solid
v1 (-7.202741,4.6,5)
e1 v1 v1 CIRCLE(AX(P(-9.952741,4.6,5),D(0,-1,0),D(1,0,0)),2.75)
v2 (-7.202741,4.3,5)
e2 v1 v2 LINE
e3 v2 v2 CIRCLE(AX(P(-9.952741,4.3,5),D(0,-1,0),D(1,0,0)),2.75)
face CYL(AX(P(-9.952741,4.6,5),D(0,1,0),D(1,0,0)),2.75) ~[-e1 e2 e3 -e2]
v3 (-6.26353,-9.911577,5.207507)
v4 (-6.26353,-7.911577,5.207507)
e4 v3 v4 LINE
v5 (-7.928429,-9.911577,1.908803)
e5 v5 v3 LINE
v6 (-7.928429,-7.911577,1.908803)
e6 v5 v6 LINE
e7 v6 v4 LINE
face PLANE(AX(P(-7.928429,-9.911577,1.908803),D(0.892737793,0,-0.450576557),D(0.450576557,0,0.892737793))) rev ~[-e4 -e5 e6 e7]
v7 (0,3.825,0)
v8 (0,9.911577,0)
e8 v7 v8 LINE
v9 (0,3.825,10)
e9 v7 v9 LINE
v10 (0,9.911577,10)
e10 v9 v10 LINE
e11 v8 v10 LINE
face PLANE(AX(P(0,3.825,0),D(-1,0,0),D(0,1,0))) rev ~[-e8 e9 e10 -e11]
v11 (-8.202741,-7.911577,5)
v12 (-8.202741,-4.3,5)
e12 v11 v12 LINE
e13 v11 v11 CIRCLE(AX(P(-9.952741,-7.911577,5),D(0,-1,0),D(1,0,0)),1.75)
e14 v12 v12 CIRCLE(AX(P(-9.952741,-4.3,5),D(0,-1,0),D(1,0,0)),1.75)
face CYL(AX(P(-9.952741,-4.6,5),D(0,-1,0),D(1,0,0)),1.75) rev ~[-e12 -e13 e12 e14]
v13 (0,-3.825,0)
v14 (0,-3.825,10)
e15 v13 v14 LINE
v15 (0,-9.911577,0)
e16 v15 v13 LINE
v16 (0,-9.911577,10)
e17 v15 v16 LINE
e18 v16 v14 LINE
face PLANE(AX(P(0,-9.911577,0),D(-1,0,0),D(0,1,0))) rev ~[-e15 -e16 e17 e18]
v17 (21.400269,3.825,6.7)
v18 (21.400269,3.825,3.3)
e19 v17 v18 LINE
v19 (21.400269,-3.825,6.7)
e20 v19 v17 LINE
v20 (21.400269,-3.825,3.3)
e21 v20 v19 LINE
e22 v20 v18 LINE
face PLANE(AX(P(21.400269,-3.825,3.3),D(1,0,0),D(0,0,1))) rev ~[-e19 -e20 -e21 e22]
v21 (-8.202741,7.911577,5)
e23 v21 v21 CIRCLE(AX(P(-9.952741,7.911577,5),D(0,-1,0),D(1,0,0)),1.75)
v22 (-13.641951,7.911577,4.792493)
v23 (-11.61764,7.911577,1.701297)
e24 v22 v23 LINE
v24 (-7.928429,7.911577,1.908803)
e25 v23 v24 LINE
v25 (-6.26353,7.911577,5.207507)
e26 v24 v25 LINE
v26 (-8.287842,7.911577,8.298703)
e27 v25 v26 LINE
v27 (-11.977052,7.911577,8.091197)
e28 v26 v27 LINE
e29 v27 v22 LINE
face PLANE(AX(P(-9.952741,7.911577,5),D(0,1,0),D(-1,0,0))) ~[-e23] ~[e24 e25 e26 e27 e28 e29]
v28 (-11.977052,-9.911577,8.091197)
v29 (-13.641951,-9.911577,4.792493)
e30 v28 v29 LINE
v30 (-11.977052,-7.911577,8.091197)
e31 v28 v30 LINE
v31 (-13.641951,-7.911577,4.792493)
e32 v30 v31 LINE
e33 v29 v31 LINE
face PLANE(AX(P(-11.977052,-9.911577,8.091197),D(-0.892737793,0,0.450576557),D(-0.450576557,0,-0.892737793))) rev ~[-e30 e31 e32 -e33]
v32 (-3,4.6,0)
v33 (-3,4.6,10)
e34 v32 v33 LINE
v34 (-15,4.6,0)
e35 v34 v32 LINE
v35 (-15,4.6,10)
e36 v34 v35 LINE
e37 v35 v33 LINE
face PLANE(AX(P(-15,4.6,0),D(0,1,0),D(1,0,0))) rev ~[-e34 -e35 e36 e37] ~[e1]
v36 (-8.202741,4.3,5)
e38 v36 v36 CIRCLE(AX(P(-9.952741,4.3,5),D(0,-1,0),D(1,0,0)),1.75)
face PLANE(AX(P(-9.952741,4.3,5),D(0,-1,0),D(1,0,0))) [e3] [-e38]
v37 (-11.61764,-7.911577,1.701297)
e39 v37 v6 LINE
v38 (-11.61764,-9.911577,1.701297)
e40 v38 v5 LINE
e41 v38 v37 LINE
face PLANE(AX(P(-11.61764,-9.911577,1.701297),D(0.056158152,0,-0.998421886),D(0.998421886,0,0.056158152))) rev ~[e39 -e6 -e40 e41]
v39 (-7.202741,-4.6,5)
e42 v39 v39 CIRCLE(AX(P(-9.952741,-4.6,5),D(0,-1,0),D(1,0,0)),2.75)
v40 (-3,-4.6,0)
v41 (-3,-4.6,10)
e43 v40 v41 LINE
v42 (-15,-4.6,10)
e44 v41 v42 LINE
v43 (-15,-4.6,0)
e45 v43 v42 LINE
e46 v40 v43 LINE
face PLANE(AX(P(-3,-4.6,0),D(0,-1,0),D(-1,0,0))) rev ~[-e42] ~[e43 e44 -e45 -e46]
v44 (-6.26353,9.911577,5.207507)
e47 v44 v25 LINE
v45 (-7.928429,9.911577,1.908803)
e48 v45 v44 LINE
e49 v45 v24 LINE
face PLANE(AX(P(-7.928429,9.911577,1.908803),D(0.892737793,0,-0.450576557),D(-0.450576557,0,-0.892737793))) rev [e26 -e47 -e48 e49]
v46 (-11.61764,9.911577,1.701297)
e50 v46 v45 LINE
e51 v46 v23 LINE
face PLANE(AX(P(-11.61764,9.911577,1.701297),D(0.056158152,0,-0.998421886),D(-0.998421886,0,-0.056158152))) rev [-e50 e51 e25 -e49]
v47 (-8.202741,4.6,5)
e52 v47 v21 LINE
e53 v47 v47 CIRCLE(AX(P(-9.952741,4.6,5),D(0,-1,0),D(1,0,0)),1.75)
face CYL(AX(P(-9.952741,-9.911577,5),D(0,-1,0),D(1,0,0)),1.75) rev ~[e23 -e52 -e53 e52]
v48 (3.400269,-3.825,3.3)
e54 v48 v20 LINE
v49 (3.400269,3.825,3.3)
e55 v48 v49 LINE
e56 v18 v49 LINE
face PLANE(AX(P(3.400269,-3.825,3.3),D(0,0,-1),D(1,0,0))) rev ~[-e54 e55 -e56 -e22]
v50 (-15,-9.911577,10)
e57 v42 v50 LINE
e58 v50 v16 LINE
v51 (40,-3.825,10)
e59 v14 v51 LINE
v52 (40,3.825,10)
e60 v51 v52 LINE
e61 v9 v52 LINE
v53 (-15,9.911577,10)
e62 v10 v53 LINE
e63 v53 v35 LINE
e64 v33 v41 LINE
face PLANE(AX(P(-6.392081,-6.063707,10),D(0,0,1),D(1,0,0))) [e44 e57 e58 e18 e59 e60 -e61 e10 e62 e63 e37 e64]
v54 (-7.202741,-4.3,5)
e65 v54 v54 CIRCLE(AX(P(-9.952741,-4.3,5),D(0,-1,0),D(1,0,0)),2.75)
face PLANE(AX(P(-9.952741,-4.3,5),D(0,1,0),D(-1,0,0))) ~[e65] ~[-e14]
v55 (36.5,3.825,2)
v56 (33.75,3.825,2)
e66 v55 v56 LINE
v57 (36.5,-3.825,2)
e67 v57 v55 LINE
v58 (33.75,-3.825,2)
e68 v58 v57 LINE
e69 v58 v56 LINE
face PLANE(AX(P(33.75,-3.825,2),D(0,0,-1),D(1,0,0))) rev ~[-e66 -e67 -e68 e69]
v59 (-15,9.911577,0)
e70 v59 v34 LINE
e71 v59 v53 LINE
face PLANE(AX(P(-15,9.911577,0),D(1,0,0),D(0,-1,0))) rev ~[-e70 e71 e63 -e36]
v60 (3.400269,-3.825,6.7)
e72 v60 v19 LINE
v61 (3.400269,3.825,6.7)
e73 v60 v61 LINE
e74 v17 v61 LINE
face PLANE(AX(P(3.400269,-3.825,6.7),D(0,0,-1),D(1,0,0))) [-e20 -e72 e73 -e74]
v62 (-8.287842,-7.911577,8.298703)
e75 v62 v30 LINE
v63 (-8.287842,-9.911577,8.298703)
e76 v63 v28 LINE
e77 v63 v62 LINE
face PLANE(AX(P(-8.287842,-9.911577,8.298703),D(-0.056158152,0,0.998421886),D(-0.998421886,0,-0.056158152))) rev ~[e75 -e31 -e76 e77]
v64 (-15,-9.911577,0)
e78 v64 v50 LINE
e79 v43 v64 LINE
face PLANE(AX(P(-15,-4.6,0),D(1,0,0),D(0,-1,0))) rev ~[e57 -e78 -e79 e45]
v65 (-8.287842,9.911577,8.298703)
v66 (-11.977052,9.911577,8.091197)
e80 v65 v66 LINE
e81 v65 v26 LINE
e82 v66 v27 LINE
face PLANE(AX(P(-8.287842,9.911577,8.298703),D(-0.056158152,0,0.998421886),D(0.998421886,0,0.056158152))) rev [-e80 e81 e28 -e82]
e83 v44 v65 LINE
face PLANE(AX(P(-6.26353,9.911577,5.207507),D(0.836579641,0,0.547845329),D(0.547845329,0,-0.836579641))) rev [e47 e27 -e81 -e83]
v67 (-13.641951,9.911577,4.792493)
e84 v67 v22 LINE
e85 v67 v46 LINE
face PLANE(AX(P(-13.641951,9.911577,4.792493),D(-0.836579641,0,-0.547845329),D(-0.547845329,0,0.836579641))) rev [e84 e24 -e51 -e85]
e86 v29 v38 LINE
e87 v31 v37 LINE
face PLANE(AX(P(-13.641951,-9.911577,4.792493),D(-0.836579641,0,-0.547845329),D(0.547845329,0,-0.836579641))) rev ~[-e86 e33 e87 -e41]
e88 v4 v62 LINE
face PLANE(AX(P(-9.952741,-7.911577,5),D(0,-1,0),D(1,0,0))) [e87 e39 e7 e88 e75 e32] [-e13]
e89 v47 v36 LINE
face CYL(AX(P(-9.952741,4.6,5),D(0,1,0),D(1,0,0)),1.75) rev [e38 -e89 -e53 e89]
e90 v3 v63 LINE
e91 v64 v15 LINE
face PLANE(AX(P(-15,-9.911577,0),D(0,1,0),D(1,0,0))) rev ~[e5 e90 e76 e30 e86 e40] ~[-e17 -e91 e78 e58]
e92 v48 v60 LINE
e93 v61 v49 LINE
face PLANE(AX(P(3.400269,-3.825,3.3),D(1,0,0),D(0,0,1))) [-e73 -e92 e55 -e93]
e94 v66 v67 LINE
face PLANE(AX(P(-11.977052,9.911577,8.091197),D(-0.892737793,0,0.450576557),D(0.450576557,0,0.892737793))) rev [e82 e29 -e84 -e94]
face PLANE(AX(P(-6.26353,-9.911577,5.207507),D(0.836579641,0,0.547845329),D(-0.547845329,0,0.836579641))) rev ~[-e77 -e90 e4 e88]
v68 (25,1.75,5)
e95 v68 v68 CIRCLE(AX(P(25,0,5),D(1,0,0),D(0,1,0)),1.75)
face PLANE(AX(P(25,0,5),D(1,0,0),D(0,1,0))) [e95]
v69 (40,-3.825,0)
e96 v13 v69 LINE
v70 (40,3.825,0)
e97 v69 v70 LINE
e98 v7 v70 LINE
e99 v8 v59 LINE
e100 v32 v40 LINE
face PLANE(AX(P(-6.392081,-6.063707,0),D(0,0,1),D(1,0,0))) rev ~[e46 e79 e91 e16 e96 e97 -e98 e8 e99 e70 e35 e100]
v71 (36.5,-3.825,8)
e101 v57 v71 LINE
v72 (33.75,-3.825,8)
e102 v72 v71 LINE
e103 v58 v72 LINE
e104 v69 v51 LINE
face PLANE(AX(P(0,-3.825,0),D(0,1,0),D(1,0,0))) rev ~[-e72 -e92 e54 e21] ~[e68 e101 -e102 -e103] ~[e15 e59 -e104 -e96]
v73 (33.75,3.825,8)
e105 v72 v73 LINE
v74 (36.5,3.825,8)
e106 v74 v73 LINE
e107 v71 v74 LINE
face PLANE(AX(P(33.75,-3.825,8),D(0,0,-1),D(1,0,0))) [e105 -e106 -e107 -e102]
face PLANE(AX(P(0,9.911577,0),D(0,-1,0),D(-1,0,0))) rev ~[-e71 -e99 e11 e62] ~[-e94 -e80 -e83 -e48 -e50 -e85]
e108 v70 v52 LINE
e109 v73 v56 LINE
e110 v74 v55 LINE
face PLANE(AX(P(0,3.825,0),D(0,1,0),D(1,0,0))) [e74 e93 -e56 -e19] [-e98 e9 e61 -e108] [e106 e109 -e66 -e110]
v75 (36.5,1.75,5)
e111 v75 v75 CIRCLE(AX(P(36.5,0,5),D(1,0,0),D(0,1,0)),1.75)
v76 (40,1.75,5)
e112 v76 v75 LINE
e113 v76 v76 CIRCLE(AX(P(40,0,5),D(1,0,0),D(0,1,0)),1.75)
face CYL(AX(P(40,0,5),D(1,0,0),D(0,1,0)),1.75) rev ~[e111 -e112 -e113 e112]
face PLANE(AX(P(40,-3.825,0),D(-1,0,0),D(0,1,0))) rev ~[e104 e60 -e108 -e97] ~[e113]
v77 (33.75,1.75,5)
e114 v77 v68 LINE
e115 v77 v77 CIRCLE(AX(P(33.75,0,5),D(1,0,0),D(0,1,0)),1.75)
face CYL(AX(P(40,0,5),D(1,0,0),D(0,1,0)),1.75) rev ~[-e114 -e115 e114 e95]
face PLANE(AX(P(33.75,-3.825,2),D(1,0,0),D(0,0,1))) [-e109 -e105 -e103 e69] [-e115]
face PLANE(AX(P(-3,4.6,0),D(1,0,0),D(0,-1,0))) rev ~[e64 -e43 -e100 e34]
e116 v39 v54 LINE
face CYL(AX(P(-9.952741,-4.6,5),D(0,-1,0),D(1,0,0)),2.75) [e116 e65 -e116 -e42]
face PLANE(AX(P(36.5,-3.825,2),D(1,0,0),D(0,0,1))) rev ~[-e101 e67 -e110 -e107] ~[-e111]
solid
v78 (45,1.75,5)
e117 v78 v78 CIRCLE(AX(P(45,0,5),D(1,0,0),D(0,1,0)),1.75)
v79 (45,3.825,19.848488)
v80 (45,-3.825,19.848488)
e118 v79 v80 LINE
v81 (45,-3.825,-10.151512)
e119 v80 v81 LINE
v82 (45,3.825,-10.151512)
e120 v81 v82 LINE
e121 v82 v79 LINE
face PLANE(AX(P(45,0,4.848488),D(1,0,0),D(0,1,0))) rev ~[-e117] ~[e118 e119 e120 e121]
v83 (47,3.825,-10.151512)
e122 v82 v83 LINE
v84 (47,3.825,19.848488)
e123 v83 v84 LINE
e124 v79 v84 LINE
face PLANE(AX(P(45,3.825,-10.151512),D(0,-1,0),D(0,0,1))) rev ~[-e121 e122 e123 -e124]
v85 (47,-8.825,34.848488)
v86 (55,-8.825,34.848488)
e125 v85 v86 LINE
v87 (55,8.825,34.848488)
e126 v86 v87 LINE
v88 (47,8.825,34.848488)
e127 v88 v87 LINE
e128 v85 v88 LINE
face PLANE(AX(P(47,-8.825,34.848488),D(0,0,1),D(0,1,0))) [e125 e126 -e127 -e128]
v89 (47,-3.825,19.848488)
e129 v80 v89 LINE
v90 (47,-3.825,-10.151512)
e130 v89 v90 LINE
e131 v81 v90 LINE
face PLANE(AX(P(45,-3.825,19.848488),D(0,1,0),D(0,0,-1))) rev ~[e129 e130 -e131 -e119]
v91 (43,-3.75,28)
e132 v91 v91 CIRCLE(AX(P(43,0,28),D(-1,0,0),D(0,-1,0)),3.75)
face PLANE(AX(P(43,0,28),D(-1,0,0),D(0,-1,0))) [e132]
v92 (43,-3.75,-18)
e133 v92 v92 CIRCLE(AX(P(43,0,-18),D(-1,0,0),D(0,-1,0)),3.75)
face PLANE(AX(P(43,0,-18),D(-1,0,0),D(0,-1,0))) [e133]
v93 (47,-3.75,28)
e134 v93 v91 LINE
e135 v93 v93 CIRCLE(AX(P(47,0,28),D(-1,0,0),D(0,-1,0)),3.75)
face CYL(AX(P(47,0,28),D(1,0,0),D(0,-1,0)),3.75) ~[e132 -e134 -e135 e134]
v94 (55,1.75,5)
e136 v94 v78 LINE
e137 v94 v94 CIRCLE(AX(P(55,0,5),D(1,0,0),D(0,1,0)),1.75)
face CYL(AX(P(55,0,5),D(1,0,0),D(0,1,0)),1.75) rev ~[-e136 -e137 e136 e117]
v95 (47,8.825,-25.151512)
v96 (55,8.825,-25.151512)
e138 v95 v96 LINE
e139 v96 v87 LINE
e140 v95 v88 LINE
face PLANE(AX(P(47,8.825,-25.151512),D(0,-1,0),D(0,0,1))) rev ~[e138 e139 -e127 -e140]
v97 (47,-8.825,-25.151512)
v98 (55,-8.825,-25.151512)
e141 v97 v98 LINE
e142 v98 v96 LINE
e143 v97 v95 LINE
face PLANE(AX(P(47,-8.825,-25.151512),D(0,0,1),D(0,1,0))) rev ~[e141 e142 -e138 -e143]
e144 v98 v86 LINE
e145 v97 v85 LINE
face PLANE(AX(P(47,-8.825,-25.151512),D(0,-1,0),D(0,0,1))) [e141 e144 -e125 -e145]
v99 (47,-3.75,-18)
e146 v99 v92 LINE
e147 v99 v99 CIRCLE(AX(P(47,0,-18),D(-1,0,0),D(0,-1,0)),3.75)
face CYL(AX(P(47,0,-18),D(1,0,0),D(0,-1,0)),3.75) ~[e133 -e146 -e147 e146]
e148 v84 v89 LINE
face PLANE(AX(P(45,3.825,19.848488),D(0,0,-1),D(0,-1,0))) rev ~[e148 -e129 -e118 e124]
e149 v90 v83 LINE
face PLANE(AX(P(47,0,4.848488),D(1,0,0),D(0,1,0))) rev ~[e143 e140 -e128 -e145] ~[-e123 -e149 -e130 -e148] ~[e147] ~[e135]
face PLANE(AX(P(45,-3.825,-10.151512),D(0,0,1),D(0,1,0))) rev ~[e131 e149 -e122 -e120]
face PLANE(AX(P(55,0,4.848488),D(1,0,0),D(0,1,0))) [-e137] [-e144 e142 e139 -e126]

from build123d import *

# Parameters (mm, degrees)
F0_W      = 40
F0_H      = 3.825
F1_DEPTH  = 10
F2_R      = 1.75
F3_DEPTH  = 19.8241538475
F4_W      = 18
F4_H      = 3.4
F4_W_2    = 2.75
F4_H_2    = 6
F5_DEPTH  = 13.7375769237
F6_R      = 1.75
F7_DEPTH  = 15
F10_DEPTH = 2
F11_W     = 17.65
F11_H     = 60
F12_DEPTH = 8
F13_R     = 1.75
F14_DEPTH = 70.001
F15_R     = 2.75
F15_R_2   = 1.75
F16_DEPTH = 0.3
F17_R     = 1.75
F18_DEPTH = 2
F19_R     = 3.75
F20_DEPTH = 4


# Not quite as in the source:
# - a pattern or mirror of a feature is missing from the dataset's text; its kind, count and spacing are read off the source's solid


with BuildPart() as f1:
    # F0 (on Top) → F1 (new body)
    with BuildSketch(Plane.XY):
        Polygon((0, -3.825), (0, 0), (-3, 0), (-3, -4.6), (-15, -4.6), (-15, -9.9115769237), (0, -9.9115769237), align=None)
        Polygon((-3, 0), (0, 0), (0, 3.825), (0, 9.9115769237), (-15, 9.9115769237), (-15, 4.6), (-3, 4.6), align=None)
        with Locations((20, 1.9125)):
            Rectangle(F0_W, F0_H)
        with Locations((20, -1.9125)):
            Rectangle(F0_W, F0_H)
    extrude(amount=F1_DEPTH)

    # F2 (on face) → F3 (cut, through all)
    with BuildSketch(Plane.XZ.offset(9.9115769237)):
        with Locations((-9.9527407438, 5)):
            Circle(F2_R)
    extrude(amount=-F3_DEPTH, mode=Mode.SUBTRACT)

    # F4 (on face) → F5 (cut, through all)
    with BuildSketch(Plane.XZ.offset(3.825)):
        with Locations((12.4002694301, 5)):
            Rectangle(F4_W, F4_H)
        with Locations((35.125, 5)):
            Rectangle(F4_W_2, F4_H_2)
    extrude(amount=-F5_DEPTH, mode=Mode.SUBTRACT)

    # F6 (on face) → F7 (cut)
    with BuildSketch(Plane.YZ.offset(40)):
        with Locations((0, 5)):
            Circle(F6_R)
    extrude(amount=-F7_DEPTH, mode=Mode.SUBTRACT)

    # F15 (on face) → F16 (join)
    with BuildSketch(Plane.XZ.offset(-4.6)):
        with Locations((-9.9527407438, 5)):
            Circle(F15_R)
        with Locations((-9.9527407438, 5)):
            Circle(F15_R_2, mode=Mode.SUBTRACT)
    f16 = extrude(amount=F16_DEPTH)

    # F16_copies: F16 across plane
    add(f16.mirror(Plane(origin=(0, 0, 0), x_dir=(0, 0, -1), z_dir=(0, -1, 0))))

    # F17 (on face) → F18 (cut)
    with BuildSketch(Plane.XZ.offset(9.9115769237)):
        Polygon((-7.9284293953, 1.9088033227), (-6.2635302189, 5.2075067143), (-8.2878415673, 8.2987033916), (-11.9770520922, 8.0911966773), (-13.6419512686, 4.7924932857), (-11.6176399202, 1.7012966084), align=None)
        with Locations((-9.9527407438, 5)):
            Circle(F17_R, mode=Mode.SUBTRACT)
    f18 = extrude(amount=-F18_DEPTH, mode=Mode.SUBTRACT)

    # F18_copies: F18 across plane
    add(f18.mirror(Plane.ZX), mode=Mode.SUBTRACT)


with BuildPart() as f10:
    # F9 (on offset) → F10 (new body)
    with BuildSketch(Plane.YZ.offset(45)):
        Polygon((3.825, 0), (3.825, 10), (3.825, 19.8484882712), (-3.825, 19.8484882712), (-3.825, 10), (-3.825, 0), (-3.825, -10.1515117288), (3.825, -10.1515117288), align=None)
    extrude(amount=F10_DEPTH)

    # F11 (on face) → F12 (join)
    with BuildSketch(Plane.YZ.offset(47)):
        with Locations((0, 4.8484882712)):
            Rectangle(F11_W, F11_H)
    extrude(amount=F12_DEPTH)

    # F13 (on face) → F14 (cut, through all)
    with BuildSketch(Plane.YZ.offset(55)):
        with Locations((0, 5)):
            Circle(F13_R)
    extrude(amount=-F14_DEPTH, mode=Mode.SUBTRACT)

    # F19 (on face) → F20 (join)
    with BuildSketch(Plane(origin=(47, 0, 0), x_dir=(0, -1, 0), z_dir=(-1, 0, 0))):
        with Locations((0, 28)):
            Circle(F19_R)
        with Locations((0, -18)):
            Circle(F19_R)
    extrude(amount=F20_DEPTH)


solid = Compound([f1.part, f10.part])
